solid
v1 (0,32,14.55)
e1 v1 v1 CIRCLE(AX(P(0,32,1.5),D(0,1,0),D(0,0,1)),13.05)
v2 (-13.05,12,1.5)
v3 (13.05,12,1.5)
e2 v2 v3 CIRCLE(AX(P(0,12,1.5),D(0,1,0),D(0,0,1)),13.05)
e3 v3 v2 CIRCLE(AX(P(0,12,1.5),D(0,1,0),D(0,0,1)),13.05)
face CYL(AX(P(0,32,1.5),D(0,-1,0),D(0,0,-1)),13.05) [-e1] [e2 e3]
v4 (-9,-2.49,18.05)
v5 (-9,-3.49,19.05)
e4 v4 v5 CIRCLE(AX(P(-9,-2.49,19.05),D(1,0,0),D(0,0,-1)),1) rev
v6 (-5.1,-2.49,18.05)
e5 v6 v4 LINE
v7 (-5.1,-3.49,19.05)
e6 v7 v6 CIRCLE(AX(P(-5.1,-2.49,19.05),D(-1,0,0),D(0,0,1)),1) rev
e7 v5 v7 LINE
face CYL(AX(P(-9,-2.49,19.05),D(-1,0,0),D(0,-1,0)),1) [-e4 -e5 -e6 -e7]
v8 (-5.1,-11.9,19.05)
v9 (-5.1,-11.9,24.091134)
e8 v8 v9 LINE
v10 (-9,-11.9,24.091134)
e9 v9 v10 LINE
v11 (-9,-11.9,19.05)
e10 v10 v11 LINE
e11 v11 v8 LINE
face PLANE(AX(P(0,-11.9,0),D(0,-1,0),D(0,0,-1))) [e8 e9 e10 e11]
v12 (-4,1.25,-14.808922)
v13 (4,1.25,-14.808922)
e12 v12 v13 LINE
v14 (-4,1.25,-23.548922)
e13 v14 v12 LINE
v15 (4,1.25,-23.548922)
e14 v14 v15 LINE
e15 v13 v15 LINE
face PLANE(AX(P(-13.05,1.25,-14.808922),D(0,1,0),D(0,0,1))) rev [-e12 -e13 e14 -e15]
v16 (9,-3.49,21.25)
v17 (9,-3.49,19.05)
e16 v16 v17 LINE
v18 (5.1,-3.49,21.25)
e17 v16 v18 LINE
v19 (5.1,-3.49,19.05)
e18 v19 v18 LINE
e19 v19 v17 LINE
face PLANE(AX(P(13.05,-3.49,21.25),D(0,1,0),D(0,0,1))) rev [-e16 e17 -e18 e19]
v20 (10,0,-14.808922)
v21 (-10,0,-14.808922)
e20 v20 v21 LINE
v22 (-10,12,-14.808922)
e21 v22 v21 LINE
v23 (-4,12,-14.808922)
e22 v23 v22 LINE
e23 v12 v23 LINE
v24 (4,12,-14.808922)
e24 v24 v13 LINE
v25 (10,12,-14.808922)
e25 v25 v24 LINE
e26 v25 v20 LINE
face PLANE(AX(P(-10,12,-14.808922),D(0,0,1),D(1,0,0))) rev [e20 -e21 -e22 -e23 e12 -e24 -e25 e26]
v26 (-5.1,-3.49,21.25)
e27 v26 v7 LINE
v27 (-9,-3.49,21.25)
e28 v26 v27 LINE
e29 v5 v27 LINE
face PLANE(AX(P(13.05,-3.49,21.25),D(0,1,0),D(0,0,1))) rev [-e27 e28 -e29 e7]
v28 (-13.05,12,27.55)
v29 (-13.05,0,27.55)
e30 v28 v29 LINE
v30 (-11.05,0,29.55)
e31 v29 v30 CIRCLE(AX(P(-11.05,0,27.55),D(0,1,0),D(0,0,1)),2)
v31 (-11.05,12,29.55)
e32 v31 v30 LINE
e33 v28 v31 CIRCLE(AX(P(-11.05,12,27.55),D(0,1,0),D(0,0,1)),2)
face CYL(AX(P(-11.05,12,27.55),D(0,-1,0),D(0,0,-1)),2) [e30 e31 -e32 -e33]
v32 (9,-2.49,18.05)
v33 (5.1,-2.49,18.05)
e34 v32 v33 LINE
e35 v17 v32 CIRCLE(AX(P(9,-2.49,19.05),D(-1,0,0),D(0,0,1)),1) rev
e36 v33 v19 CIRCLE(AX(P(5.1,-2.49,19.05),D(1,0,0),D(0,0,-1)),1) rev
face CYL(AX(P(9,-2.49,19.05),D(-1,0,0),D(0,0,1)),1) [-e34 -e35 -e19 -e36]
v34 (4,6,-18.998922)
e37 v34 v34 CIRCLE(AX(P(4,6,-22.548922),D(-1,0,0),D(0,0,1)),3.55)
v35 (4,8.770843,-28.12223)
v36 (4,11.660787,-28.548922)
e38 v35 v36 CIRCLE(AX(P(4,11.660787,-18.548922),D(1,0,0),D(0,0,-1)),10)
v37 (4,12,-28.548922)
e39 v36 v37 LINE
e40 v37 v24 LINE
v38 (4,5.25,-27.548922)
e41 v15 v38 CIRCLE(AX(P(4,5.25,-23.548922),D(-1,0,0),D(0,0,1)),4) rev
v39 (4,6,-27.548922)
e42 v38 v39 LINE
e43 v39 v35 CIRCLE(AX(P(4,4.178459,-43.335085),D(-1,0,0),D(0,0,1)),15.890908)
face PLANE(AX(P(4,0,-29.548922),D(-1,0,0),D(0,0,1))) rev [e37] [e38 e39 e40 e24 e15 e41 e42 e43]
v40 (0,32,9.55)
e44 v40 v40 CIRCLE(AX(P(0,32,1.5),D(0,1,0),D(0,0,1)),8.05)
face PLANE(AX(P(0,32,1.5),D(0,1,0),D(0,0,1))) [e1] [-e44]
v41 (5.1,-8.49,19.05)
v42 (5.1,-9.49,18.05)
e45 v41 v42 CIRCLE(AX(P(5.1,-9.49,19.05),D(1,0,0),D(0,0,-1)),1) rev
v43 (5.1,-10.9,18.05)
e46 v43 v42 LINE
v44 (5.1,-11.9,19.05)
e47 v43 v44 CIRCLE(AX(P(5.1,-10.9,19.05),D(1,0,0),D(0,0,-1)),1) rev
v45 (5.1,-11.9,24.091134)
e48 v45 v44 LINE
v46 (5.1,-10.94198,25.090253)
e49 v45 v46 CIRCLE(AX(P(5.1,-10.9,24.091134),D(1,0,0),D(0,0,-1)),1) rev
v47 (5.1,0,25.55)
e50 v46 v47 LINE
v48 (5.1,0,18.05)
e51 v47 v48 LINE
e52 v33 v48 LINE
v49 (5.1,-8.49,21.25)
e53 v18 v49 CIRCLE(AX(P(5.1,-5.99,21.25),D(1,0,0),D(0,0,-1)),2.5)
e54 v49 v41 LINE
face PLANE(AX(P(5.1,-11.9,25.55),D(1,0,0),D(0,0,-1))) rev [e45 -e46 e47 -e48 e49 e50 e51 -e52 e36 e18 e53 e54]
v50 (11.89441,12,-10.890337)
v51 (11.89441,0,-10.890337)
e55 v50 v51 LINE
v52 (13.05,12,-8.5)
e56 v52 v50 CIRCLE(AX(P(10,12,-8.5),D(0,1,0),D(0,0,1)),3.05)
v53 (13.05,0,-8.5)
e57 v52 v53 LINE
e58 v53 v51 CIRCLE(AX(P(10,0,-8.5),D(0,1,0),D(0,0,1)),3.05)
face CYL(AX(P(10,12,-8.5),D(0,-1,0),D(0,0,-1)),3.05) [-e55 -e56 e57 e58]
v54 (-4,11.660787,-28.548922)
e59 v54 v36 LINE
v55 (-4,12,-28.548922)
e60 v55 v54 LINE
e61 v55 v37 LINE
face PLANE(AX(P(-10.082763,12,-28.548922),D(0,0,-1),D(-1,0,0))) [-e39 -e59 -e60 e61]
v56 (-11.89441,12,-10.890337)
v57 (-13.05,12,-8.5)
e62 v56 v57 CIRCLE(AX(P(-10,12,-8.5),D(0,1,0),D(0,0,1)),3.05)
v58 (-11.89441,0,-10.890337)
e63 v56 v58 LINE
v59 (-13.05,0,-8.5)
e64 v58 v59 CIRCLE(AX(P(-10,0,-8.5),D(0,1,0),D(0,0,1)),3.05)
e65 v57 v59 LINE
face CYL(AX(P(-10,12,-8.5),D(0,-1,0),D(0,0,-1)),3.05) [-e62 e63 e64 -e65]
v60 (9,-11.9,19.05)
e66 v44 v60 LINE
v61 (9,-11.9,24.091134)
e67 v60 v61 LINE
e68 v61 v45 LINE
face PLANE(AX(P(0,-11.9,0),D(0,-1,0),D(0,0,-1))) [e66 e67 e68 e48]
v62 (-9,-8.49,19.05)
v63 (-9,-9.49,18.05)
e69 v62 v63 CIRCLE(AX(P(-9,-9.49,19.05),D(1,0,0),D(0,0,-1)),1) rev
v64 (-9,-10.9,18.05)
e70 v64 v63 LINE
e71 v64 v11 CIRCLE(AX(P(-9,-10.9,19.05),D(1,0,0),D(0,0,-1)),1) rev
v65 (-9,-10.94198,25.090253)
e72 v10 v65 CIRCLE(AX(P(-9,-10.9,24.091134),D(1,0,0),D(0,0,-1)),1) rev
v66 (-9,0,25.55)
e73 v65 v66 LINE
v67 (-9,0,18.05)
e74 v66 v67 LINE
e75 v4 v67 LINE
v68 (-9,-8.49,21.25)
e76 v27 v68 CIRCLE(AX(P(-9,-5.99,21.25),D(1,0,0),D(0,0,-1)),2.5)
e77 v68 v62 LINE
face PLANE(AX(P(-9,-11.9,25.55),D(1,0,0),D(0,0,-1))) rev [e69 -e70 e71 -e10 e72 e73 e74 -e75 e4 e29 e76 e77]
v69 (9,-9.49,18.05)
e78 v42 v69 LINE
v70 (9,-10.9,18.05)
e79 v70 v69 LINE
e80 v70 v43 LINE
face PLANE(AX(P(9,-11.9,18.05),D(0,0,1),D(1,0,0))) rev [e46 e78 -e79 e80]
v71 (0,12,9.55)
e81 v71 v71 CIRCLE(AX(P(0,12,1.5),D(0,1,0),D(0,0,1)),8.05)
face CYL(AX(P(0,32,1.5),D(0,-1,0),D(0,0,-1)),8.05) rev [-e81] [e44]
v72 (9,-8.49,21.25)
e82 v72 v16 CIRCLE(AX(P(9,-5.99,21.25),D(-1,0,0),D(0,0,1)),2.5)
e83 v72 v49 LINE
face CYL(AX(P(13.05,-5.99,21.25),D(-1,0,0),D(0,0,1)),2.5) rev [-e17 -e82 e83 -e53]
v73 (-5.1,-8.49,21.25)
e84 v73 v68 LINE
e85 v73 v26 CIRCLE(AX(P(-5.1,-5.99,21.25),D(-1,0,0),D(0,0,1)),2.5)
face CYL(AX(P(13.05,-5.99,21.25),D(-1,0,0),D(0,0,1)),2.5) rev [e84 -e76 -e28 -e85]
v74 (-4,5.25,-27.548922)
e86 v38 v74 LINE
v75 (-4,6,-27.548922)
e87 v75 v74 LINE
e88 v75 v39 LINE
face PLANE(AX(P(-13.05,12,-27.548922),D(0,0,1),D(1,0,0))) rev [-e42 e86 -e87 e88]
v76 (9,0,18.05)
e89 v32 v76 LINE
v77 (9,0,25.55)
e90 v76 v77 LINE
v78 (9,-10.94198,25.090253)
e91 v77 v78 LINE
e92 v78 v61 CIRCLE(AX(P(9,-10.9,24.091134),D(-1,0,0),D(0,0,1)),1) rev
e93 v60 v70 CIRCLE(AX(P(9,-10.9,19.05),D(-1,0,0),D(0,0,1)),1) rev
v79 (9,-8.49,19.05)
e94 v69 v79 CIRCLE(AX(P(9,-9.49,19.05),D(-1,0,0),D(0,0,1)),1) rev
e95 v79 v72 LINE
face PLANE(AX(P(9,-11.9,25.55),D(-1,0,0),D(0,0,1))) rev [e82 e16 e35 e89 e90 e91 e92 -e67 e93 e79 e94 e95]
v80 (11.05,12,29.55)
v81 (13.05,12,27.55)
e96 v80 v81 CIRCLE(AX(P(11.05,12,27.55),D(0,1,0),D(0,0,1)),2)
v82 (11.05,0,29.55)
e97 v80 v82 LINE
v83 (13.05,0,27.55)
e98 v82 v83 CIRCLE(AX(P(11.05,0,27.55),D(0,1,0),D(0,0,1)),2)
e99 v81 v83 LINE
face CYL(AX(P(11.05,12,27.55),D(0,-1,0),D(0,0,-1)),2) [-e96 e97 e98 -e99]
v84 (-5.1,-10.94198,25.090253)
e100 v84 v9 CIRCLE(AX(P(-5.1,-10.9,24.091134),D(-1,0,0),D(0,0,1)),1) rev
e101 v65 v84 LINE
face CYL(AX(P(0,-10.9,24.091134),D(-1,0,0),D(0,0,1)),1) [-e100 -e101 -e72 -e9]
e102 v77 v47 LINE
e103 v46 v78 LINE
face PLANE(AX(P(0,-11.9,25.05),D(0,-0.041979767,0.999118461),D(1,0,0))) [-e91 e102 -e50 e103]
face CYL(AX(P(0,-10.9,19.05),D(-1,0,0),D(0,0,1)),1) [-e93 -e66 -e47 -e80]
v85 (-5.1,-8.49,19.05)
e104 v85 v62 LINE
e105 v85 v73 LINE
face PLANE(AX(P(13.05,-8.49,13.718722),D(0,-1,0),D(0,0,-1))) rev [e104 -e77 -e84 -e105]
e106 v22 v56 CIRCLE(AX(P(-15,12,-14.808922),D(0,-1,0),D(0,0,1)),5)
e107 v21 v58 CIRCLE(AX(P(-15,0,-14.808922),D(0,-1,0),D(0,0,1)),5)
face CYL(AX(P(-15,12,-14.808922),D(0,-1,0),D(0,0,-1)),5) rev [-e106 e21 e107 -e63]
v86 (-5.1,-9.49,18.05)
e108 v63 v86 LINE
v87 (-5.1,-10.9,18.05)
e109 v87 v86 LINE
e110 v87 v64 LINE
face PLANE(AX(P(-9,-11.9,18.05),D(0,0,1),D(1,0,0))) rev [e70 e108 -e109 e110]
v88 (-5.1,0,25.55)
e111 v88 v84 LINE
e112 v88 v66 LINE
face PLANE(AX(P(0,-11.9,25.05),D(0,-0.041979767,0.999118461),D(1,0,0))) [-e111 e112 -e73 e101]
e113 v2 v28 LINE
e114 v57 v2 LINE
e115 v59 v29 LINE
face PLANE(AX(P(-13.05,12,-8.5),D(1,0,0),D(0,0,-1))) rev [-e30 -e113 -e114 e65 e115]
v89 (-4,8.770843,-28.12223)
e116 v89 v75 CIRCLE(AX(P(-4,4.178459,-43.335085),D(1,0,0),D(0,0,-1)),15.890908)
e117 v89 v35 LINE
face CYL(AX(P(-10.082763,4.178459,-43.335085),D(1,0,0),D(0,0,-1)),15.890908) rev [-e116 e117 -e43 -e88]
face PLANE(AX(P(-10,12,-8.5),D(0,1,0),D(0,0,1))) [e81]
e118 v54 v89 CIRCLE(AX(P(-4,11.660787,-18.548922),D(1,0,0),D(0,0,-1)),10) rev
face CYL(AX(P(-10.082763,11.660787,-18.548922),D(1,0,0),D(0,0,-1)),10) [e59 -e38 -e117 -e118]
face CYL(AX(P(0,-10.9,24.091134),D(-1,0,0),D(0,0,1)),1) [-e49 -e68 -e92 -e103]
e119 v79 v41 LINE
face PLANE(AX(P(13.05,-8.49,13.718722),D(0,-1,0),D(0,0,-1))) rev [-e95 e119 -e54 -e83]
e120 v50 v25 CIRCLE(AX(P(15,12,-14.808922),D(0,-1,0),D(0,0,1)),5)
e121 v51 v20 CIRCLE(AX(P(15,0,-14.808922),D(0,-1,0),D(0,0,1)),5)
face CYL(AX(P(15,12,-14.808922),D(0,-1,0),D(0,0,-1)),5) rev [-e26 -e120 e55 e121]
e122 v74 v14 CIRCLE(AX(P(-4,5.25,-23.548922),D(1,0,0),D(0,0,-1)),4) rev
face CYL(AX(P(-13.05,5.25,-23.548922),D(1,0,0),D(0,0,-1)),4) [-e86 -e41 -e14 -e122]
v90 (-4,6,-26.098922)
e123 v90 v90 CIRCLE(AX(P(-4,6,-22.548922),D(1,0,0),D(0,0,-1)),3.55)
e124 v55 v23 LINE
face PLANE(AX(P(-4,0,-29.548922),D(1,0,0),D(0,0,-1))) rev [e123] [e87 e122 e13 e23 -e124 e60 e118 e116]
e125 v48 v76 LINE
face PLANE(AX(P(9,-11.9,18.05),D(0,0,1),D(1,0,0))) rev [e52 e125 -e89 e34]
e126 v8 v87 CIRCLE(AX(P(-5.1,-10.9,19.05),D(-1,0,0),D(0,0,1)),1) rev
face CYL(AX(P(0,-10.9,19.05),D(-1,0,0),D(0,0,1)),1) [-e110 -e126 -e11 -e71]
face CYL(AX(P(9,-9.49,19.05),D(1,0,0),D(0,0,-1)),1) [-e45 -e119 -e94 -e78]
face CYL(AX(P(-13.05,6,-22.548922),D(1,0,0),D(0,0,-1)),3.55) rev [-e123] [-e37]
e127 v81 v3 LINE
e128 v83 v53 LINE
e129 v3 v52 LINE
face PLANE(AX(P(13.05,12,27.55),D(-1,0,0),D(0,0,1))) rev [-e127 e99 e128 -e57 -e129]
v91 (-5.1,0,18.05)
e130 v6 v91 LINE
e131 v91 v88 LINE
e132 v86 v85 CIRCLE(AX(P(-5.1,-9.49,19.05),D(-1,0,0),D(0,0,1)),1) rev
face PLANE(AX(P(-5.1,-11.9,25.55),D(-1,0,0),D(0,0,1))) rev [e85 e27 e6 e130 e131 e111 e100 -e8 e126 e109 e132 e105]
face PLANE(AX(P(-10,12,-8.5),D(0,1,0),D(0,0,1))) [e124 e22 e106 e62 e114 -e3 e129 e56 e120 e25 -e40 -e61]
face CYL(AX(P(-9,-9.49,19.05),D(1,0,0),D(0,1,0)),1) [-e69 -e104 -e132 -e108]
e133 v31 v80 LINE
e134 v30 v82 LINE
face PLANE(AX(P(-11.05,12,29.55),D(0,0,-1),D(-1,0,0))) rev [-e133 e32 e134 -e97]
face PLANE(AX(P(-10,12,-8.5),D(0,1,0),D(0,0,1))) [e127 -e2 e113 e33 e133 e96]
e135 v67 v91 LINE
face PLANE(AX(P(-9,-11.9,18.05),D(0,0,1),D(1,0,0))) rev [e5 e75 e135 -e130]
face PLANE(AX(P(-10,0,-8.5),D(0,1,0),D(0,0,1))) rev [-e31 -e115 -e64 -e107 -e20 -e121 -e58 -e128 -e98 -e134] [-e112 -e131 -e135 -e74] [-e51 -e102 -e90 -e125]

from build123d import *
from OCP.BRepFilletAPI import BRepFilletAPI_MakeChamfer

# Parameters (mm, degrees)
BOSS_EXTRUDE1_DEPTH     = 12
SKETCH2_W               = 8
SKETCH2_H               = 12
BOSS_EXTRUDE2_DEPTH     = 14.74
CUT_EXTRUDE1_DEPTH      = 37.164969238
CUT_EXTRUDE1_DEPTH_BACK = 37.164969238
SKETCH3_W               = 14.74
SKETCH3_H               = 1.25
CUT_EXTRUDE2_DEPTH      = 37.164969238
CUT_EXTRUDE2_DEPTH_BACK = 37.164969238
SKETCH4_R               = 3.55
CUT_EXTRUDE3_DEPTH      = 37.164969238
CUT_EXTRUDE3_DEPTH_BACK = 37.164969238
SKETCH6_W               = 2
SKETCH6_H               = 10.75
FILLET1_R               = 4
BOSS_EXTRUDE3_DEPTH     = 8
SKETCH8_R               = 13.05
SKETCH8_R_2             = 8.05
BOSS_EXTRUDE4_DEPTH     = 20
SKETCH9_W               = 3.9
SKETCH9_H               = 7.5
BOSS_EXTRUDE5_DEPTH     = 11.9
CUT_EXTRUDE4_DEPTH      = 49.820129045
CUT_EXTRUDE4_DEPTH_BACK = 49.820129045
CHAMFER1_SIZE           = 11.9
CHAMFER1_SIZE_2         = 0.5
FILLET3_R               = 1


with BuildPart() as part:
    # Sketch1 → Boss-Extrude1 (new body)
    with BuildSketch(Plane(origin=(0, 0, 0), x_dir=(1, 0, 0), z_dir=(0, 1, 0))):
        with BuildLine():
            Line((-13.05, 8.5), (-13.05, -27.55))
            ThreePointArc((-13.05, -27.55), (-12.464213562, -28.964213562), (-11.05, -29.55))
            Line((-11.05, -29.55), (11.05, -29.55))
            ThreePointArc((11.05, -29.55), (12.464213562, -28.964213562), (13.05, -27.55))
            Line((13.05, -27.55), (13.05, 8.5))
            ThreePointArc((13.05, 8.5), (12.745947042, 9.827507004), (11.894409938, 10.890337003))
            ThreePointArc((11.894409938, 10.890337003), (10.498447473, 12.632681264), (10, 14.808922253))
            Line((10, 14.808922253), (-10, 14.808922253))
            ThreePointArc((-10, 14.808922253), (-10.498447473, 12.632681264), (-11.894409938, 10.890337003))
            ThreePointArc((-11.894409938, 10.890337003), (-12.745947042, 9.827507004), (-13.05, 8.5))
        make_face()
    extrude(amount=BOSS_EXTRUDE1_DEPTH)

    # Sketch2 → Boss-Extrude2 (add)
    with BuildSketch(Plane(origin=(0, 0, -14.808922253), x_dir=(-1, 0, 0), z_dir=(0, 0, -1))):
        with Locations((0, 6)):
            Rectangle(SKETCH2_W, SKETCH2_H)
    extrude(amount=BOSS_EXTRUDE2_DEPTH)

    # Sketch3 → Cut-Extrude1 (cut, two sides: drawn at the far end of the back side and taken through both)
    with BuildSketch(Plane(origin=(4, 0, 0), x_dir=(0, 0, -1), z_dir=(1, 0, 0)).offset(-CUT_EXTRUDE1_DEPTH_BACK)):
        with Locations((22.178922253, 0.625)):
            Rectangle(SKETCH3_W, SKETCH3_H)
    extrude(amount=CUT_EXTRUDE1_DEPTH + CUT_EXTRUDE1_DEPTH_BACK, mode=Mode.SUBTRACT)

    # Sketch4 → Cut-Extrude2 (cut, two sides: drawn at the far end of the back side and taken through both)
    with BuildSketch(Plane(origin=(4, 0, 0), x_dir=(0, 0, -1), z_dir=(1, 0, 0)).offset(-CUT_EXTRUDE2_DEPTH_BACK)):
        with Locations((22.548922253, 6)):
            Circle(SKETCH4_R)
    extrude(amount=CUT_EXTRUDE2_DEPTH + CUT_EXTRUDE2_DEPTH_BACK, mode=Mode.SUBTRACT)

    # Sketch6 → Cut-Extrude3 (cut, two sides: drawn at the far end of the back side and taken through both)
    with BuildSketch(Plane(origin=(4, 0, 0), x_dir=(0, 0, -1), z_dir=(1, 0, 0)).offset(-CUT_EXTRUDE3_DEPTH_BACK)):
        with Locations((28.548922253, 6.625)):
            Rectangle(SKETCH6_W, SKETCH6_H)
    extrude(amount=CUT_EXTRUDE3_DEPTH + CUT_EXTRUDE3_DEPTH_BACK, mode=Mode.SUBTRACT)

    # Fillet1
    fillet1_edges = [part.edges().sort_by_distance(p)[0] for p in [
        (0, 1.25, -27.548922253),
    ]]
    fillet(fillet1_edges, radius=FILLET1_R)

    # Sketch7 → Boss-Extrude3 (add)
    with BuildSketch(Plane(origin=(4, 0, 0), x_dir=(0, 0, -1), z_dir=(1, 0, 0))):
        with BuildLine():
            Line((27.548922253, 10), (27.548922253, 6))
            ThreePointArc((27.548922253, 6), (27.773781475, 7.398207316), (28.122230045, 8.770843088))
            ThreePointArc((28.122230045, 8.770843088), (28.441674093, 10.200150162), (28.548922253, 11.660787366))
            Line((28.548922253, 11.660787366), (28.548922253, 12))
            Line((28.548922253, 12), (27.548922253, 12))
            Line((27.548922253, 12), (27.548922253, 10))
        make_face()
    extrude(amount=-BOSS_EXTRUDE3_DEPTH)

    # Sketch8 → Boss-Extrude4 (add)
    with BuildSketch(Plane(origin=(0, 12, 0), x_dir=(1, 0, 0), z_dir=(0, 1, 0))):
        with Locations(Location((0, -1.5, 0), (0, 0, 180))):
            Circle(SKETCH8_R)
        with Locations(Location((0, -1.5, 0), (0, 0, 270))):
            Circle(SKETCH8_R_2, mode=Mode.SUBTRACT)
    extrude(amount=BOSS_EXTRUDE4_DEPTH)

    # Sketch9 → Boss-Extrude5 (add)
    with BuildSketch(Plane.XZ):
        with Locations((-7.05, 21.8)):
            Rectangle(SKETCH9_W, SKETCH9_H)
        with Locations((7.05, 21.8)):
            Rectangle(SKETCH9_W, SKETCH9_H)
    extrude(amount=BOSS_EXTRUDE5_DEPTH)

    # Sketch10 → Cut-Extrude4 (cut, two sides: drawn at the far end of the back side and taken through both)
    with BuildSketch(Plane.ZY.offset(9).offset(-CUT_EXTRUDE4_DEPTH_BACK)):
        with BuildLine():
            Line((21.25, -3.49), (13.718722393, -3.49))
            Line((13.718722393, -3.49), (13.718722393, -8.49))
            Line((13.718722393, -8.49), (21.25, -8.49))
            ThreePointArc((21.25, -8.49), (23.75, -5.99), (21.25, -3.49))
        make_face()
    extrude(amount=CUT_EXTRUDE4_DEPTH + CUT_EXTRUDE4_DEPTH_BACK, mode=Mode.SUBTRACT)

    # Chamfer1
    chamfer1_edges_1 = [part.edges().sort_by_distance(p)[0] for p in [
        (-7.05, -11.9, 25.55),
    ]]
    chamfer1_side_1 = [part.faces().sort_by_distance(p)[0] for p in [
        (-7.05, -11.89, 25.55),
    ]]
    chamfer1_edges_2 = [part.edges().sort_by_distance(p)[0] for p in [
        (7.05, -11.9, 25.55),
    ]]
    chamfer1_side_2 = [part.faces().sort_by_distance(p)[0] for p in [
        (7.05, -11.89, 25.55),
    ]]
    chamfer1 = BRepFilletAPI_MakeChamfer(part.part.solid().wrapped)
    for e in chamfer1_edges_1:
        chamfer1.Add(CHAMFER1_SIZE - 0.0001, CHAMFER1_SIZE_2 - 0.0001, e.wrapped, chamfer1_side_1[0].wrapped)
    for e in chamfer1_edges_2:
        chamfer1.Add(CHAMFER1_SIZE - 0.0001, CHAMFER1_SIZE_2 - 0.0001, e.wrapped, chamfer1_side_2[0].wrapped)
    add(Compound.cast(chamfer1.Shape()), mode=Mode.REPLACE)  # a hair under: the kernel refuses the full size

    # Fillet3
    fillet3_edges = [part.edges().sort_by_distance(p)[0] for p in [
        (-7.05, -11.9, 18.05),
        (7.05, -11.9, 18.05),
        (7.05, -8.49, 18.05),
        (-7.05, -8.49, 18.05),
        (7.05, -3.49, 18.05),
        (-7.05, -3.49, 18.05),
        (-7.05, -11.9, 25.0501),
        (7.05, -11.9, 25.0501),
    ]]
    fillet(fillet3_edges, radius=FILLET3_R)


solid = part.part
